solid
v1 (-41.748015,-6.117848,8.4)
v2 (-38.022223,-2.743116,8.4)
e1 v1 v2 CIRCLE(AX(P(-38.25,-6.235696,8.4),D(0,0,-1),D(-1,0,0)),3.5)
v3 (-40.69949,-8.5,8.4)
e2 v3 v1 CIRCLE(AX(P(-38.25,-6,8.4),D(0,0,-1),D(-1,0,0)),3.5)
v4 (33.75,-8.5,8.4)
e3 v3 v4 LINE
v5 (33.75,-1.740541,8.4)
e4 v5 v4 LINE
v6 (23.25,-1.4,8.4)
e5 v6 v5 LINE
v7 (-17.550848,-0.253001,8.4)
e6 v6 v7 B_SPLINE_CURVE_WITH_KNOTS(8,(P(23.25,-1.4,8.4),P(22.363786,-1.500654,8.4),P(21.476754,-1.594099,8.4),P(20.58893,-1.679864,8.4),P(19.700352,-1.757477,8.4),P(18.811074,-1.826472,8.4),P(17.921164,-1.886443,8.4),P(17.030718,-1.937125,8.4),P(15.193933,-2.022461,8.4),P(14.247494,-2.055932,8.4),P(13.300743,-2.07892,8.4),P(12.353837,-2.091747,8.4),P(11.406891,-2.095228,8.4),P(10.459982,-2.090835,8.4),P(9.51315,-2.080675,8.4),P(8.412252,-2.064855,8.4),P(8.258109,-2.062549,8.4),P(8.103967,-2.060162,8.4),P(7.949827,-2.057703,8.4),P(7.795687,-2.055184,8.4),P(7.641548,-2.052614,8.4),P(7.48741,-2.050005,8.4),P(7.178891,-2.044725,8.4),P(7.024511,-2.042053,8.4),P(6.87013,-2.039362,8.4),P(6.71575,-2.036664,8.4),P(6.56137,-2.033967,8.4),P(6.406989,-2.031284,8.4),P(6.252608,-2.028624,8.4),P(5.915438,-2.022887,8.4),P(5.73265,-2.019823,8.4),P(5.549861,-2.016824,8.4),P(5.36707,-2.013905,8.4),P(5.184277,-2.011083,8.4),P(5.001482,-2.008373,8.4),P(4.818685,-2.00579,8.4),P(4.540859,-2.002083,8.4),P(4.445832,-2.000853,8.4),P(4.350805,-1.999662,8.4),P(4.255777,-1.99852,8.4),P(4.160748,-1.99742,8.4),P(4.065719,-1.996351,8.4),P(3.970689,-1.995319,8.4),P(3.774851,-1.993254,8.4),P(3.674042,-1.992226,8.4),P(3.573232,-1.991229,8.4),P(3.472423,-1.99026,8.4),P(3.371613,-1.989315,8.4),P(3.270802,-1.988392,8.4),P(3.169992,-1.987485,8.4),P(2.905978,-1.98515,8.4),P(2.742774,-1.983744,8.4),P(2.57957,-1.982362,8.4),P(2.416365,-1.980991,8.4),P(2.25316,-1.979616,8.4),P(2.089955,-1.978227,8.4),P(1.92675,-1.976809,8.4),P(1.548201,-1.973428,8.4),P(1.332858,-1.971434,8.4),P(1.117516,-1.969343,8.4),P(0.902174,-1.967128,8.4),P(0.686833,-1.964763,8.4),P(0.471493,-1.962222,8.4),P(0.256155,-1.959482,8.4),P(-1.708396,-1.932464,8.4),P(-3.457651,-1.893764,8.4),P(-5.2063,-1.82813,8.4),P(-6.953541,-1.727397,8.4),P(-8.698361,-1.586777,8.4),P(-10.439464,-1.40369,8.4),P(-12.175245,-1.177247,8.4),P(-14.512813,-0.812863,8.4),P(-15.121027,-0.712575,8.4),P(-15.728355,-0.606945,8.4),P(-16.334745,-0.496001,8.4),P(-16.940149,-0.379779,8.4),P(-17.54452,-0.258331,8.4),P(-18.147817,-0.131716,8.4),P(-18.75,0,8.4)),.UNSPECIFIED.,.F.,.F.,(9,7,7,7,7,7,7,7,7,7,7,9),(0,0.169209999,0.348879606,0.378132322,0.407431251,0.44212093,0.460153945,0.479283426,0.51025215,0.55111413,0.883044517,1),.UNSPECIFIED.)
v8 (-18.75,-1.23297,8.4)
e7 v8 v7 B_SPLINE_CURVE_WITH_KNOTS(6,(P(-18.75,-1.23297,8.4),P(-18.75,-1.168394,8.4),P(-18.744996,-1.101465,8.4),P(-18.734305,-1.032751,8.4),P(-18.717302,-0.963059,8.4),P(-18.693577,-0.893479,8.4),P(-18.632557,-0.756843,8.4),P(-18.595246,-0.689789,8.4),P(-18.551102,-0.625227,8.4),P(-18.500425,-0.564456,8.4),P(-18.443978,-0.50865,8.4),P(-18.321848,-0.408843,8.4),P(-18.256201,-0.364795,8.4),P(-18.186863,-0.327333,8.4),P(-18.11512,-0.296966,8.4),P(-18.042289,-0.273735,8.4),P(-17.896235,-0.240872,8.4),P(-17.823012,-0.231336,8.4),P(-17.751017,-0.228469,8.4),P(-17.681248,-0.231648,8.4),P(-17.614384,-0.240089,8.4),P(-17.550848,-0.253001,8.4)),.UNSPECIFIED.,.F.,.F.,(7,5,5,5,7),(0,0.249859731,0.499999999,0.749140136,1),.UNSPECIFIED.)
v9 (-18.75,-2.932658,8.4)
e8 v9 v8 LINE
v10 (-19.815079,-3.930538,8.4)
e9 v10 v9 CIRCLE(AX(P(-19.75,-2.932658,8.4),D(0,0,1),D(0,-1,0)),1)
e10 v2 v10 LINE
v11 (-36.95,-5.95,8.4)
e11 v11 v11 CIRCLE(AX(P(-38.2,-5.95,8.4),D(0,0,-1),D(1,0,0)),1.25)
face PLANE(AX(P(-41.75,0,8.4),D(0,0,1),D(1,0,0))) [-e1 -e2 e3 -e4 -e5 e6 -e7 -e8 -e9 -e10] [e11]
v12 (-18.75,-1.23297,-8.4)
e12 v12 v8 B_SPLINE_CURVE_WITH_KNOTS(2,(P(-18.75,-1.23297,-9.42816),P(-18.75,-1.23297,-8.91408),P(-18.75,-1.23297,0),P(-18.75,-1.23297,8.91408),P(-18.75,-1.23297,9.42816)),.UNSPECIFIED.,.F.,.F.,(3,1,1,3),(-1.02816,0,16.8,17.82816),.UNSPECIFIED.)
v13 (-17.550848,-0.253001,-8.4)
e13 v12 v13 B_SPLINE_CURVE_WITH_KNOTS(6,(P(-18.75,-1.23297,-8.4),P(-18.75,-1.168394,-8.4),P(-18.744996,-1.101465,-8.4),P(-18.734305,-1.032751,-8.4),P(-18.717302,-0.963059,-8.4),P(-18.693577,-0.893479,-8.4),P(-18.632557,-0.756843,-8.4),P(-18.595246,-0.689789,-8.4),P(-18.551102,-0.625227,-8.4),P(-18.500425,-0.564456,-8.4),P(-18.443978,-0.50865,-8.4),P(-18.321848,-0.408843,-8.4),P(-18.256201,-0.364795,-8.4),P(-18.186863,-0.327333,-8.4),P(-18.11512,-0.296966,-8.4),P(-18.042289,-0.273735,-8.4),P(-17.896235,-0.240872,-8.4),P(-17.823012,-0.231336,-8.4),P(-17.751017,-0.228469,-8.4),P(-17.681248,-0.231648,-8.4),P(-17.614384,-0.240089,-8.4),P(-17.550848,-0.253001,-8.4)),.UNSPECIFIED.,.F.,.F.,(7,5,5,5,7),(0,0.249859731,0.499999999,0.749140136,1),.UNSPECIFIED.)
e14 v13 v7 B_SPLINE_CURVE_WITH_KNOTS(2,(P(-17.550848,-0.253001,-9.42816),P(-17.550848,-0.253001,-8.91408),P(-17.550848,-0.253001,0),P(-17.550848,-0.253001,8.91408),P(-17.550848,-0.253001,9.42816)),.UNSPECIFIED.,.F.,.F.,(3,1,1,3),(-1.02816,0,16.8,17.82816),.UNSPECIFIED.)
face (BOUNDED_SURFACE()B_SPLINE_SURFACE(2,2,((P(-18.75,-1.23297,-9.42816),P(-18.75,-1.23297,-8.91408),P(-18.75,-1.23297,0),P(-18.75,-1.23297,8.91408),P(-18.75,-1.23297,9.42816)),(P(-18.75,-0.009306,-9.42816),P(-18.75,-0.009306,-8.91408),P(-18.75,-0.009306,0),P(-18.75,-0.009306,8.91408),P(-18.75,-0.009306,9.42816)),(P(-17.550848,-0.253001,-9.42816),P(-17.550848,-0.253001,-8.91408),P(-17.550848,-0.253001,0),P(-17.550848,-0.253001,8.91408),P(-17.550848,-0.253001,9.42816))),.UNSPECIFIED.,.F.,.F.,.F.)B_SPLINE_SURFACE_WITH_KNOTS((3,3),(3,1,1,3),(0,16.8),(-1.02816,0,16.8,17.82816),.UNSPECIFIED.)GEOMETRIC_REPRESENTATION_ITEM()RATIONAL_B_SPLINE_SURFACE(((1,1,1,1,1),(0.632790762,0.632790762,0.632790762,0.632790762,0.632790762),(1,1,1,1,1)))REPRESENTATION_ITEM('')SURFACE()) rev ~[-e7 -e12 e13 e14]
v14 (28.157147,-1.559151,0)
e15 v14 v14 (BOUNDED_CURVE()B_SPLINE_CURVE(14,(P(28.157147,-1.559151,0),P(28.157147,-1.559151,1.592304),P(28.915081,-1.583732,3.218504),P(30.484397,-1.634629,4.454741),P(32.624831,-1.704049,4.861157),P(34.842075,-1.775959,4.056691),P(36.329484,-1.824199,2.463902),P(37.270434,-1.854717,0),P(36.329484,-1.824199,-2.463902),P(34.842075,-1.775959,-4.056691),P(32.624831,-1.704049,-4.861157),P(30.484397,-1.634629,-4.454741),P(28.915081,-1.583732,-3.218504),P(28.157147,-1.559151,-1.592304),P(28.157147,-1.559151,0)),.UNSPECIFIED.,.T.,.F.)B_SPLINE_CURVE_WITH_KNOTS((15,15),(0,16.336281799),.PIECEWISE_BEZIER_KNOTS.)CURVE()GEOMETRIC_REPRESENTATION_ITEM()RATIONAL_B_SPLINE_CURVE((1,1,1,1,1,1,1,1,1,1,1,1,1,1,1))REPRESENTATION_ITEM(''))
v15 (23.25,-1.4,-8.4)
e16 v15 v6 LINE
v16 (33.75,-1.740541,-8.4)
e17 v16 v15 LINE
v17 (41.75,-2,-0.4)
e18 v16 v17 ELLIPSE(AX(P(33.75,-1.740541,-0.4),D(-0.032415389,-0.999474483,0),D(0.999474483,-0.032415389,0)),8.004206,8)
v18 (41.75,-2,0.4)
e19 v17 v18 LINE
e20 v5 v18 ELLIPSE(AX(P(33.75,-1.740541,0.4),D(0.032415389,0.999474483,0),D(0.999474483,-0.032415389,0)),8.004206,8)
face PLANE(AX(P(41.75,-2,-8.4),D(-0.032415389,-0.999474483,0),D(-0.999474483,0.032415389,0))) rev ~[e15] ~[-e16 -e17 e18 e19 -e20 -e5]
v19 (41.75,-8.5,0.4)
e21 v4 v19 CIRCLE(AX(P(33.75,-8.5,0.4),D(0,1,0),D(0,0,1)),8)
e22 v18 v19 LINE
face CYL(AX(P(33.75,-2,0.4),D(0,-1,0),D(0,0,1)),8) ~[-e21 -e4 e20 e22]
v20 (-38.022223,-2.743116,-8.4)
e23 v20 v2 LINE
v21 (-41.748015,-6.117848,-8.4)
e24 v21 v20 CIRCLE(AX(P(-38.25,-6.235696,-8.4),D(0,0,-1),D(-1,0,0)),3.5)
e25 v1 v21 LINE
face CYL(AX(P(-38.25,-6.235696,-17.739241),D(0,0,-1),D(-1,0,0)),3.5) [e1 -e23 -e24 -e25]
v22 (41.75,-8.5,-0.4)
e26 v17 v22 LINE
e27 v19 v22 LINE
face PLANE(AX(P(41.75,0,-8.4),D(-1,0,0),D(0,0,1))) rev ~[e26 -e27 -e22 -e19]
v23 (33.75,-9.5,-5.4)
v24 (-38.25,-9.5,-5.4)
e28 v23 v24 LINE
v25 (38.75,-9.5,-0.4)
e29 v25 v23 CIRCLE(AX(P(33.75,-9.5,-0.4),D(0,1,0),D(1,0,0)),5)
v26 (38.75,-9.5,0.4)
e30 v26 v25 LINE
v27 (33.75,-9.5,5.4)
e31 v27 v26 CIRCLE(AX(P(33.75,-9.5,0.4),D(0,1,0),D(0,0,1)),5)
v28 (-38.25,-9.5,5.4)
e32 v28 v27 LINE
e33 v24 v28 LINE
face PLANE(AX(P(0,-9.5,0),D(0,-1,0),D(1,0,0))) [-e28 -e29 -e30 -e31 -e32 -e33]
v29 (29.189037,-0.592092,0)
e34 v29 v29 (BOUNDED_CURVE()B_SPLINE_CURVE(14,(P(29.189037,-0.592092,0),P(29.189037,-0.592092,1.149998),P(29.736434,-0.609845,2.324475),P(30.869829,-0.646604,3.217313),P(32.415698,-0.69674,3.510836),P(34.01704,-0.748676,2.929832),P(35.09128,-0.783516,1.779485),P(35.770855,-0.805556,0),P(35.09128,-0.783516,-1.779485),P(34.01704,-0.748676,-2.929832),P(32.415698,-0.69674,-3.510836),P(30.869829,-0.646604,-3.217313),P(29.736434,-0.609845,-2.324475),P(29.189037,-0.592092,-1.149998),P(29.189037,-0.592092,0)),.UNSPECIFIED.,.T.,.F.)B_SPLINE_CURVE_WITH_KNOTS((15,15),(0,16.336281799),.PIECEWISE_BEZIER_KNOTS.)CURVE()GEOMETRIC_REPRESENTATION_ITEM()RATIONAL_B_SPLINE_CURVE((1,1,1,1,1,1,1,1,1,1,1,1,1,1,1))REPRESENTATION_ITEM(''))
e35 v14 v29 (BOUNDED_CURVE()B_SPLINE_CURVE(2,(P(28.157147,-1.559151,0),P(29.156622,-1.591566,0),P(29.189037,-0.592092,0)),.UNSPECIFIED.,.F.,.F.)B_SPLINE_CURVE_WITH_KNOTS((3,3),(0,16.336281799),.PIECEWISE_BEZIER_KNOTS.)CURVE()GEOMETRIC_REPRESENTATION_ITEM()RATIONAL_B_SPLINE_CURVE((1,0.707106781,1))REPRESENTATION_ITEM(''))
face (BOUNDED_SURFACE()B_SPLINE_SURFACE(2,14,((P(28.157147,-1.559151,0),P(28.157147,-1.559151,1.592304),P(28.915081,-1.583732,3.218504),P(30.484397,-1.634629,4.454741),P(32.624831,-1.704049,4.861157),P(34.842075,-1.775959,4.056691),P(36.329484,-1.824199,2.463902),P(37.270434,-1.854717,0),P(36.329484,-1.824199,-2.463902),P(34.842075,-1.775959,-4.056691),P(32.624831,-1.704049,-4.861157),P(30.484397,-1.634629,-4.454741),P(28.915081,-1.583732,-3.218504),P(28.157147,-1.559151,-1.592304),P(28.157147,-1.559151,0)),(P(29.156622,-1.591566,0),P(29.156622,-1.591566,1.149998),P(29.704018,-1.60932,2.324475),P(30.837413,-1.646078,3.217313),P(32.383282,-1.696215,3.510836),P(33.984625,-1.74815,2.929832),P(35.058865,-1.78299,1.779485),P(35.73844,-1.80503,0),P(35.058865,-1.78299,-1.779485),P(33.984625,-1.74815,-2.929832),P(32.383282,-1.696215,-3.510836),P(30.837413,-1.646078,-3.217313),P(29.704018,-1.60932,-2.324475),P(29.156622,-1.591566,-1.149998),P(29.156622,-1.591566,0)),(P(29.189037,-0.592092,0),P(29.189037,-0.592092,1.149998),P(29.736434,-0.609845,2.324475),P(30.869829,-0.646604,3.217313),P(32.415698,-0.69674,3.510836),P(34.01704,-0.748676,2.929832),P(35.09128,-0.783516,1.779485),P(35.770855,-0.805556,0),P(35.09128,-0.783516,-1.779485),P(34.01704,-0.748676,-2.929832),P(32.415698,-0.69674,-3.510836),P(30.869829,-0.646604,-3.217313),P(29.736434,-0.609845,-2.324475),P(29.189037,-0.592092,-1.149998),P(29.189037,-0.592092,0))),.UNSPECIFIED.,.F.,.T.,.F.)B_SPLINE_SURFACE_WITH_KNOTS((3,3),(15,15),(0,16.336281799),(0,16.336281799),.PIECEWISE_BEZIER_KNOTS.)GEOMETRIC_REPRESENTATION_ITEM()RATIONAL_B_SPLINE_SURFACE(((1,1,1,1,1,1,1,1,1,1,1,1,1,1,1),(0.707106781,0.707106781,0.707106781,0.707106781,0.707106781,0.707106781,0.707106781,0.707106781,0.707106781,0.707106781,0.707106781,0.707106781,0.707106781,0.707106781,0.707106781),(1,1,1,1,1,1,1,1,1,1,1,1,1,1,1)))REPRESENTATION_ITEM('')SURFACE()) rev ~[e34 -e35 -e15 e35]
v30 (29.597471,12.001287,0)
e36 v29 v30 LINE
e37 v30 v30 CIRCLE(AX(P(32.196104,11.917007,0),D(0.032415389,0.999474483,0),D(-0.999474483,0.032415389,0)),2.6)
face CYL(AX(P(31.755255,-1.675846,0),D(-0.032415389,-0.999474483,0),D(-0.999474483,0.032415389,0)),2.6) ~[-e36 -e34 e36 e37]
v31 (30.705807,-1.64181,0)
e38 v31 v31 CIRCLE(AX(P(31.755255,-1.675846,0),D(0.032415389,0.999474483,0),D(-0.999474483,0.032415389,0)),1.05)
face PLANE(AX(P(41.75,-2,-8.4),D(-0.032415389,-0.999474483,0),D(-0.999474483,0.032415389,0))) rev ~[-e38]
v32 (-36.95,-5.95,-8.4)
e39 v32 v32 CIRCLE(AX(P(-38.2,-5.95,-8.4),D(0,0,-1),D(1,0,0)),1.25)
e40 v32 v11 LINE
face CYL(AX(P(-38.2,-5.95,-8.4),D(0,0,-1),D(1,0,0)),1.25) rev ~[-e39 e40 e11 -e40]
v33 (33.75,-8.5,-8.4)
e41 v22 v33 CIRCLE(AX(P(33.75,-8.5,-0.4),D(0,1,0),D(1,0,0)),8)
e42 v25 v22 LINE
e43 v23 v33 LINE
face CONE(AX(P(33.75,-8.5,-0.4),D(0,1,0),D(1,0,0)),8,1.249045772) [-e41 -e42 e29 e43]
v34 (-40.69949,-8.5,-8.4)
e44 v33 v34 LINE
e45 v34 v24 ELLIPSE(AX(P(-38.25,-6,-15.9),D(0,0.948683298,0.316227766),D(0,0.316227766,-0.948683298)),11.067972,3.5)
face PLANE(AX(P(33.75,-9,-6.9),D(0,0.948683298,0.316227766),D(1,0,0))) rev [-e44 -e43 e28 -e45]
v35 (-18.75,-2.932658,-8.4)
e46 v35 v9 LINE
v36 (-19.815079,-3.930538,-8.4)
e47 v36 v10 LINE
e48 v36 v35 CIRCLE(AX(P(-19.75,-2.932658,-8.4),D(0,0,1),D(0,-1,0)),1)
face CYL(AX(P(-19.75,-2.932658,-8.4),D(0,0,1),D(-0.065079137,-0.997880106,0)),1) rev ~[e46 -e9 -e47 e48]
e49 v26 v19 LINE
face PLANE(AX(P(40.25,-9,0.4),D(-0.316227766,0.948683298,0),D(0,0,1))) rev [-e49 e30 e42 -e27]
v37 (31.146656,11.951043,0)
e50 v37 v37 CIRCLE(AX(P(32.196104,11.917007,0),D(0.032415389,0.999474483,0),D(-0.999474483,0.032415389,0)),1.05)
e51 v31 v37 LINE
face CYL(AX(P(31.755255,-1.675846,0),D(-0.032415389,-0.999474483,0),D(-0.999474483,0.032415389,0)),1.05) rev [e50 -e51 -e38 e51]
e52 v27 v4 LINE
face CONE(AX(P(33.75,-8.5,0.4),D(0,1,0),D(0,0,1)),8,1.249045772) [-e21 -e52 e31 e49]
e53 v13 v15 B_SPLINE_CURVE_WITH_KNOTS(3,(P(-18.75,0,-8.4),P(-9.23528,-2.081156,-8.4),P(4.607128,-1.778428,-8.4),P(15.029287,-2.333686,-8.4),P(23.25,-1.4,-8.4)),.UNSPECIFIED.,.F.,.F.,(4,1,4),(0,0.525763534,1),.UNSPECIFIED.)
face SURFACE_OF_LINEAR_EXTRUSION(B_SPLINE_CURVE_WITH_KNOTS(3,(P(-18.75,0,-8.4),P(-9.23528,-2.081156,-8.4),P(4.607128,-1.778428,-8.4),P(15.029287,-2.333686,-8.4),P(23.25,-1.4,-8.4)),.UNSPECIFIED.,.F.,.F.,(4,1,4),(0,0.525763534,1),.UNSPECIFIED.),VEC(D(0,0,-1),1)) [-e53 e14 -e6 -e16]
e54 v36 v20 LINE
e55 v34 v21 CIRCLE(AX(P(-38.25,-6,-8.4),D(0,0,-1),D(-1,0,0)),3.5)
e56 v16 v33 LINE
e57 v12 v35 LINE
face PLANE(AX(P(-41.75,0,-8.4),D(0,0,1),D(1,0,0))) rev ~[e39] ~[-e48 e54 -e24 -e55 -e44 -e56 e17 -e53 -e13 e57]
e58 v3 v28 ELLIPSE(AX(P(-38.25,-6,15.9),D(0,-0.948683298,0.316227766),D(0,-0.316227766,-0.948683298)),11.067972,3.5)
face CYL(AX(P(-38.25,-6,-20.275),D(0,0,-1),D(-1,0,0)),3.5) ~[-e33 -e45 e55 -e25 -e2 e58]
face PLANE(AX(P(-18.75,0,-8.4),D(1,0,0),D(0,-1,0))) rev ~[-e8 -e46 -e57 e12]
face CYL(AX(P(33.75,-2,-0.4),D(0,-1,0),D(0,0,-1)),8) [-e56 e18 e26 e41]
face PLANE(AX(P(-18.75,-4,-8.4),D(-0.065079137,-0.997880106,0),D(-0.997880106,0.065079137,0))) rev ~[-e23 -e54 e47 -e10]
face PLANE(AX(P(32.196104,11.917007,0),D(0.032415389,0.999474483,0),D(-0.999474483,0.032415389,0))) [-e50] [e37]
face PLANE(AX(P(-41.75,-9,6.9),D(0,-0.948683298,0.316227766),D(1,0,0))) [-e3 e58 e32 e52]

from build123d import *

# Parameters (mm, degrees)
F0_W        = 83.5
F0_H        = 16.8
F1_DEPTH    = 9.5
F2_R        = 1.25
F3_DEPTH    = 25
F4_R        = 2.6
F4_R_2      = 1.05
F5_DEPTH    = 13.6
F6_R        = 1
F7_R        = 8
F8_SIZE2    = 1
F8_SIZE     = 3
F9_T1_DEPTH = 35.4784813046
F9_T3_DEPTH = 40.55


# Not quite as in the source:
# - a fillet or chamfer that OpenCascade refuses, or shapes differently, is made with other operations: its cross-section is extruded or revolved along the edge and cut away or added
# - a feature names something its author has since deleted; it is built from what else it names


with BuildPart() as f1:
    # F0 (on Front) → F1 (new body)
    with BuildSketch(Plane.XZ):
        Rectangle(F0_W, F0_H)
    extrude(amount=F1_DEPTH)

    # F2 (on face) → F3 (cut)
    with BuildSketch(Plane(origin=(0, 0, -8.4), x_dir=(1, 0, 0), z_dir=(0, 0, -1))):
        with Locations((-38.2, 5.95)):
            Circle(F2_R)
        Polygon((-18.75, 0), (-18.75, 4), (-41.75, 2.5), (-41.75, 0), align=None)
        with BuildLine():
            add(Edge.make_bspline(
                [(-18.75, 0), (-9.2352803439, 2.081155549), (4.6071284628, 1.7784279246), (15.029287035, 2.3336862795), (23.25, 1.4)],
                knots=[0, 0, 0, 0, 0.5257635341, 1, 1, 1, 1], degree=3))
            Line((-18.75, 0), (41.75, 0))
            Line((41.75, 0), (41.75, 2))
            Line((41.75, 2), (23.25, 1.4))
        make_face()
    extrude(amount=-F3_DEPTH, mode=Mode.SUBTRACT)

    # F4 (on face) → F5 (join)
    with BuildSketch(Plane(origin=(-0.0209275853, -0.6452672134, 0), x_dir=(-0.9994744832, 0.0324153886, 0), z_dir=(0.0324153886, 0.9994744832, 0))):
        with Locations((-31.7928904511, 0)):
            Circle(F4_R)
        with Locations((-31.7928904511, 0)):
            Circle(F4_R_2, mode=Mode.SUBTRACT)
    extrude(amount=F5_DEPTH)

    # F6
    f6_edges = [f1.edges().sort_by_distance(p)[0] for p in [
        (-18.75, -4, 0),
        (34.353889, -1.760126, 0),
        (-18.75, 0, 0),
    ]]
    fillet(f6_edges, radius=F6_R)

    # F7
    f7_edges = [f1.edges().sort_by_distance(p)[0] for p in [
        (41.75, -5.75, 8.4),
        (41.75, -5.75, -8.4),
    ]]
    fillet(f7_edges, radius=F7_R)

    # F8
    f8_edges = [f1.edges().sort_by_distance(p)[0] for p in [
        (-4, -9.5, 8.4),
    ]]
    f8_side = f1.faces().sort_by_distance((-0.798169, -9.5, 0))[0]
    chamfer(f8_edges, length=F8_SIZE, length2=F8_SIZE2, reference=f8_side)

    # F9: fillet of radius 3.5 on 2 edges, made by hand

    # F9_s2 → F9_t1 (cut)
    with BuildSketch(Plane.XY.offset(-17.7392406523)):
        with BuildLine():
            ThreePointArc((-41.75, -6.2356962609), (-40.6429877316, -3.6815604548), (-38.0222230193, -2.74311589))
            Line((-38.0222230193, -2.74311589), (-41.75, -2.5))
            Line((-41.75, -2.5), (-41.75, -6.2356962609))
        make_face()
    extrude(amount=F9_T1_DEPTH, mode=Mode.SUBTRACT)

    # F9_s4 → F9_t3 (cut)
    with BuildSketch(Plane.XY.offset(-20.275)):
        with BuildLine():
            ThreePointArc((-41.75, -6), (-40.7248737342, -8.4748737342), (-38.25, -9.5))
            Line((-38.25, -9.5), (-41.75, -9.5))
            Line((-41.75, -9.5), (-41.75, -6))
        make_face()
    extrude(amount=F9_T3_DEPTH, mode=Mode.SUBTRACT)


solid = f1.part
